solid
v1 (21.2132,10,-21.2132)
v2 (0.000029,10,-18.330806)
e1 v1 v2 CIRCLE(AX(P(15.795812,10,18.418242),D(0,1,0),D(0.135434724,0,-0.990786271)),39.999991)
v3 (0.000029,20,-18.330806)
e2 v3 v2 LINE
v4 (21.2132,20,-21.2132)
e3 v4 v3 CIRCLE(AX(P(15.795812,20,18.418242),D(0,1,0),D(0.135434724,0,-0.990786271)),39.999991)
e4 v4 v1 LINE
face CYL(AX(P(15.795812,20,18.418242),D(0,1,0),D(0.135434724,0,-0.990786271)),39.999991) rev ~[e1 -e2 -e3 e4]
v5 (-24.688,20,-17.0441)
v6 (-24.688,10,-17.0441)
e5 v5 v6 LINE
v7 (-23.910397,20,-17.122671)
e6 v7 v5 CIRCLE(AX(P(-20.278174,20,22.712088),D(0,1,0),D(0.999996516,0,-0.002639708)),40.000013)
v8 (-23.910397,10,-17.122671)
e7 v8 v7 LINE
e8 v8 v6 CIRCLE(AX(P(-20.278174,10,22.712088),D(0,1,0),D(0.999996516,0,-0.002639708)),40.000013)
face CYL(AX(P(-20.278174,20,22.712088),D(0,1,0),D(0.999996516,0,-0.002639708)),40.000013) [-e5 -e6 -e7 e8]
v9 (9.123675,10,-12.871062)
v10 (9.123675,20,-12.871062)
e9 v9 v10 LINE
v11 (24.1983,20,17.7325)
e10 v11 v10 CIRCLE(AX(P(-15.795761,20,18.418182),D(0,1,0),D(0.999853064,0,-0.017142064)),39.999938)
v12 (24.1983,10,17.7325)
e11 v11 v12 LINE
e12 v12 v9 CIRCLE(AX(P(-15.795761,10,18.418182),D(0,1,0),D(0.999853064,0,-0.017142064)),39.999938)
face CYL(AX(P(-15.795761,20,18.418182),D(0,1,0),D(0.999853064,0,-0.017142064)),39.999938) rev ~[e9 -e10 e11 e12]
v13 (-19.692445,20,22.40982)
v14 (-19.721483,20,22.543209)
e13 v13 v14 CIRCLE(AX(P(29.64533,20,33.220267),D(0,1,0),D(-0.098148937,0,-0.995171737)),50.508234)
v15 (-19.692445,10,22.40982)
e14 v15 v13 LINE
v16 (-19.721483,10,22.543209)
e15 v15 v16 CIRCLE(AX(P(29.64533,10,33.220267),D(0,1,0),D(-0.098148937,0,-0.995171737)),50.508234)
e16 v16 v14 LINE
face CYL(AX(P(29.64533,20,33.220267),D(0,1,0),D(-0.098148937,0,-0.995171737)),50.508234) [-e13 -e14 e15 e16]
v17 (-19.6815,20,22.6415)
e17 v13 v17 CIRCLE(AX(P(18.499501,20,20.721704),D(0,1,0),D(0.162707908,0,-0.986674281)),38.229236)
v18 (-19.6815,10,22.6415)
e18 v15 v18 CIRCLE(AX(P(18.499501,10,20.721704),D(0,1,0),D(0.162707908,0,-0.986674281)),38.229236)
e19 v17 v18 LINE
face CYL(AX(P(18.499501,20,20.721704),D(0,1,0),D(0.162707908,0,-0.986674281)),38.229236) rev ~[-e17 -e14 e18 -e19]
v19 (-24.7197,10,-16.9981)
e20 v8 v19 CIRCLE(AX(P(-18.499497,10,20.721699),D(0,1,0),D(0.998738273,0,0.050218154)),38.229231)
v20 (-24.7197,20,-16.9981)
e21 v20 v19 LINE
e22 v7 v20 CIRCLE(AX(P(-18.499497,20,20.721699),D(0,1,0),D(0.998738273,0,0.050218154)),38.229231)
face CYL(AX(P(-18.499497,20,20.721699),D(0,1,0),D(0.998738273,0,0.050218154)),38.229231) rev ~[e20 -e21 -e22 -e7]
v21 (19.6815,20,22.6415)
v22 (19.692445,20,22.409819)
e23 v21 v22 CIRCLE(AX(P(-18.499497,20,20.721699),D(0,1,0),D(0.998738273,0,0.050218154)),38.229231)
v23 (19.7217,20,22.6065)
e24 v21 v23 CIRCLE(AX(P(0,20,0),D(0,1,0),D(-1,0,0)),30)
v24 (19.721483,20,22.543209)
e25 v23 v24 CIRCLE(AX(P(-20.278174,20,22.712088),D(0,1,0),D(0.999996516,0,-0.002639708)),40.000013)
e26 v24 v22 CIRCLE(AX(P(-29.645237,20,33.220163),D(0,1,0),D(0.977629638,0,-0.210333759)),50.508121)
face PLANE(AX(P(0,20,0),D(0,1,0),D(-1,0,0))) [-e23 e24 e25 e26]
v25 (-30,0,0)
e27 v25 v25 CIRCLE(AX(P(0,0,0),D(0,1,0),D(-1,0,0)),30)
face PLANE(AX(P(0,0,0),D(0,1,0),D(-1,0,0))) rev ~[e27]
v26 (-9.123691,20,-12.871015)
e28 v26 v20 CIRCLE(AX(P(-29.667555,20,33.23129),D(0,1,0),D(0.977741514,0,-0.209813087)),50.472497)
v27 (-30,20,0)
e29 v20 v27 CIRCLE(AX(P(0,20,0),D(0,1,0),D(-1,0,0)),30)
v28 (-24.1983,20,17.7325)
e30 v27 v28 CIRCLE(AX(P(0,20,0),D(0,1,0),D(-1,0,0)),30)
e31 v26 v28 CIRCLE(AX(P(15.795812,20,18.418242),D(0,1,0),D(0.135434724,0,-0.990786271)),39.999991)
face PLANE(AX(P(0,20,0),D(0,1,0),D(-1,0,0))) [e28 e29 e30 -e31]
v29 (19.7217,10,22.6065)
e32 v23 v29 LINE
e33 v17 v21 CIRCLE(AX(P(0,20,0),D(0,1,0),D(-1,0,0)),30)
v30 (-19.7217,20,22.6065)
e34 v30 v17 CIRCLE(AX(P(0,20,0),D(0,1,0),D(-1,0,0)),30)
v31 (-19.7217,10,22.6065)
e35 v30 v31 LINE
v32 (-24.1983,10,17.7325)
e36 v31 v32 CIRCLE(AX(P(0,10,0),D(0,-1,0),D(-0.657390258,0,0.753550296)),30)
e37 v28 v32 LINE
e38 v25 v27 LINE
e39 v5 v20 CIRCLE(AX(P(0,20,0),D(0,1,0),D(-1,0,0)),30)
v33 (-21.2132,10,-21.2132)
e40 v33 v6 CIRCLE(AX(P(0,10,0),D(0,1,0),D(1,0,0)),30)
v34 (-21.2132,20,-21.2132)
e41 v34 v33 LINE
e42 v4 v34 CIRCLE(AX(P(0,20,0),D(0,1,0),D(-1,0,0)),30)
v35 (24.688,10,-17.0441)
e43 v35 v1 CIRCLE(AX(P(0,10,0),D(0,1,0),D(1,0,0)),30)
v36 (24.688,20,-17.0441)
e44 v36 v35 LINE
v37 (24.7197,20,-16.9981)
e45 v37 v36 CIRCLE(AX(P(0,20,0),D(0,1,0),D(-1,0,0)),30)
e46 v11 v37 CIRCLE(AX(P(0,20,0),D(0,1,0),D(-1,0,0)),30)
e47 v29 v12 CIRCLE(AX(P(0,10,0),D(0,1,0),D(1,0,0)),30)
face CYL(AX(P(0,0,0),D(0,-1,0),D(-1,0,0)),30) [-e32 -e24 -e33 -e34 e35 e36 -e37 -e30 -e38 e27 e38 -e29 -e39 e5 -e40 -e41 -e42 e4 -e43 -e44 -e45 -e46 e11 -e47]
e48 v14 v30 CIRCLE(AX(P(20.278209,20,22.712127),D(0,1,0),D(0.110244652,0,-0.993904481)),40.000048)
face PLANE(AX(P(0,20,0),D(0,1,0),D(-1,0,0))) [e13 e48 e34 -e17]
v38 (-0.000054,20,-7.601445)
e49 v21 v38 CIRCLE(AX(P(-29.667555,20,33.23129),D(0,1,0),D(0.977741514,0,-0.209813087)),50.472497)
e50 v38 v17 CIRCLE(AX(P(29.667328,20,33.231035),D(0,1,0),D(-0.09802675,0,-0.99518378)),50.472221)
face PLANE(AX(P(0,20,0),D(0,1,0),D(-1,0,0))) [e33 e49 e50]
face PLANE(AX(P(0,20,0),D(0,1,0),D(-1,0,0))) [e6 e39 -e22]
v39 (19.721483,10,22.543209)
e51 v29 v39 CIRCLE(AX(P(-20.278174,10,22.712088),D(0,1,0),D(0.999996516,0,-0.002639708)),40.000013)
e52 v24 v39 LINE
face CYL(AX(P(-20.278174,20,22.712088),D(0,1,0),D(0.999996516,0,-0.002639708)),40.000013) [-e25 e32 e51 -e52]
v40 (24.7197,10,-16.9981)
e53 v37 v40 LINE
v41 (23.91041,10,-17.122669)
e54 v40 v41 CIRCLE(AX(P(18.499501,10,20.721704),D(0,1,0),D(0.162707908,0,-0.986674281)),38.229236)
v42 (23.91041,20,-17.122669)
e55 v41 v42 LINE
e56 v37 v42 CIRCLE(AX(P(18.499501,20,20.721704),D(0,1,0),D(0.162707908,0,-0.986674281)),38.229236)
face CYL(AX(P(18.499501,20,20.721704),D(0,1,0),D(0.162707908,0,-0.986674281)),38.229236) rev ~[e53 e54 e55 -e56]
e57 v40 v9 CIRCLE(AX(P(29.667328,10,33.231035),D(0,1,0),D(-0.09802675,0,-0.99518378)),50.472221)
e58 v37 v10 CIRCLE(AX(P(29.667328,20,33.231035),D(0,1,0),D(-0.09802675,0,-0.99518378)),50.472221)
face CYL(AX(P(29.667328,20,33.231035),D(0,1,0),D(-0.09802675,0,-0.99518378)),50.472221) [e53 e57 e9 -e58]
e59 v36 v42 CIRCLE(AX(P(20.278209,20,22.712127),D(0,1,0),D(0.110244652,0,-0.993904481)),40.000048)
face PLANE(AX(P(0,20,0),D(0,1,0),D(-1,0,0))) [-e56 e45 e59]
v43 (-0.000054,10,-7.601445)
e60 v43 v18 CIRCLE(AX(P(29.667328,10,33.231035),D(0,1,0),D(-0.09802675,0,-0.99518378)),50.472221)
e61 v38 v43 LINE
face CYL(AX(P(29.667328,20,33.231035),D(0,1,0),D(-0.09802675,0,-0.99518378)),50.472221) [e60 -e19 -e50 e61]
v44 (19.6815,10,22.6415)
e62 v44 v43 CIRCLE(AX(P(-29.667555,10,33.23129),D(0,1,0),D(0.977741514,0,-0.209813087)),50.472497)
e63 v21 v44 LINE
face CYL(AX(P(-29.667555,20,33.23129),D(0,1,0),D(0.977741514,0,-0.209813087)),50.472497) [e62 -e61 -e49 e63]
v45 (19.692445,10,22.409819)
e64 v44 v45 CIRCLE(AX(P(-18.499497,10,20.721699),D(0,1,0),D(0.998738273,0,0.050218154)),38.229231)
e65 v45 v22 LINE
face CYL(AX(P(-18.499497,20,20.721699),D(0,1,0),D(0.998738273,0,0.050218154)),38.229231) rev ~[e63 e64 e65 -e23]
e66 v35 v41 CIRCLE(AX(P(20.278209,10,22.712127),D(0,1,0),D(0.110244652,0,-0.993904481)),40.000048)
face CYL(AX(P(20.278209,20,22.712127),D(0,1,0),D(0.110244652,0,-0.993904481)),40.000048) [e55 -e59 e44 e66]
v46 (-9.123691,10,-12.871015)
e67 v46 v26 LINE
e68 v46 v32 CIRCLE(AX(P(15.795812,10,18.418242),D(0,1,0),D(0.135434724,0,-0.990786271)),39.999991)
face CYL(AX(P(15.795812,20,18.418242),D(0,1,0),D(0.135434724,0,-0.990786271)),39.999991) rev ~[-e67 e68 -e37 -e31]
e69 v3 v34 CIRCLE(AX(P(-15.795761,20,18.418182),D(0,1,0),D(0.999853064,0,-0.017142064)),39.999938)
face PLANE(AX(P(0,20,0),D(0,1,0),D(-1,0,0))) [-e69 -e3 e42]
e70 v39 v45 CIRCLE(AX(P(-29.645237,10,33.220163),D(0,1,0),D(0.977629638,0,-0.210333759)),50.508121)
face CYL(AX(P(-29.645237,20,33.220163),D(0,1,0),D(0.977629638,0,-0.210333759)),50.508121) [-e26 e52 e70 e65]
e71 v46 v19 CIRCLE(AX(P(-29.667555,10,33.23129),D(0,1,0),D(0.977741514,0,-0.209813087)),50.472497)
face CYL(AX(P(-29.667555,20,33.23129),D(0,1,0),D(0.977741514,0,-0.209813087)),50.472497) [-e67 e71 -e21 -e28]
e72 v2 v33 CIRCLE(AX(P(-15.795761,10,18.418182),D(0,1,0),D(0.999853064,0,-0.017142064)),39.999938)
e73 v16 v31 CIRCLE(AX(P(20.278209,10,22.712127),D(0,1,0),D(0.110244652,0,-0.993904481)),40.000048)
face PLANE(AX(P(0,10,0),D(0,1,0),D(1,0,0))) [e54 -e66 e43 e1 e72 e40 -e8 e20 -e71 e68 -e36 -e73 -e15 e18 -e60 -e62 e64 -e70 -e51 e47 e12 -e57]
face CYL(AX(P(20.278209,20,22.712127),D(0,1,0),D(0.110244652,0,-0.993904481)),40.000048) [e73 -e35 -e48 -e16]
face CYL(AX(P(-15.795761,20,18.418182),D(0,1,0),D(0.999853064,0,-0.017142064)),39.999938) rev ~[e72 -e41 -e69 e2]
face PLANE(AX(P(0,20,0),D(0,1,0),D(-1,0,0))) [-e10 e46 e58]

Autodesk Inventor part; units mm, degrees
ref_plane "YZ Plane" through (0, 0, 0) normal (1, 0, 0) x (0, 1, 0)
ref_plane "XZ Plane" through (0, 0, 0) normal (0, 1, 0) x (-1, 0, 0)
ref_plane "XY Plane" through (0, 0, 0) normal (0, 0, 1) x (1, 0, 0)
sketch "Esboço1" plane through (0, 0, 0) normal (0, 1, 0) x (-1, 0, 0)
  circle A0 centre (0, 0) radius 30
extrude "Extrusão1" add sketch "Esboço1" along normal blind 20
sketch "Esboço2" plane through (0, 20, 0) normal (0, 1, 0) x (1, 0, 0)
  circle A0 centre (0, 0) radius 30 projected
  arc A1 (21.2132, 21.2132) -> (-24.1983, -17.7325) centre (15.7958, -18.4182) ccw
  arc A2 (24.1983, -17.7325) -> (-21.2132, 21.2132) centre (-15.7958, -18.4182) ccw
  arc A3 (24.688, 17.0441) -> (-19.7217, -22.6065) centre (20.2782, -22.7121) ccw
  arc A4 (19.7217, -22.6065) -> (-24.688, 17.0441) centre (-20.2782, -22.7121) ccw
  point P0 (-6.4534, 14.8229)
  point P1 (0, 11.7668)
  point P2 (6.4534, 14.8229)
  point P3 (0, 18.3308)
extrude "Extrusão2" cut sketch "Esboço2" against normal blind 10 contours A3 A2 A1 A0 | A0 A4 A3 A2 | A3 A4 A1 A2 | A2 A1 A4 A0 | A3 A0 A1 A4
sketch "Esboço3" plane through (0, 20, 0) normal (0, 1, 0) x (1, 0, 0)
  circle A0 centre (0, 0) radius 30 projected
  arc A1 (-6.4534, 14.8229) -> (-24.688, 17.0441) centre (-20.2782, -22.7121) ccw projected
  arc A2 (19.733, -22.5966) -> (-24.688, 17.0441) centre (-29.6453, -33.2202) ccw
  arc A3 (24.688, 17.0441) -> (-19.733, -22.5966) centre (29.6453, -33.2202) ccw
  arc A4 (19.7217, -22.6065) -> (0, 11.7668) centre (-20.2782, -22.7121) ccw projected
  arc A5 (19.733, -22.5966) -> (0, 11.7668) centre (-9.6777, -16.638) ccw
  arc A6 (0, 11.7668) -> (-19.733, -22.5966) centre (6.925, -15.0573) ccw
  point P0 (0, 7.6727)
  point P1 (19.7215, -22.5432)
extrude "Extrusão3" cut sketch "Esboço3" against normal blind 10 contours A2 A3 A4 | A6 A2 A3 | A6 A4 A3 A2
sketch "Esboço4" plane through (0, 20, 0) normal (0, 1, 0) x (1, 0, 0)
  circle A0 centre (0, 0) radius 30 projected
  arc A1 (19.6815, -22.6415) -> (-24.7197, 16.9981) centre (-29.6674, -33.2312) ccw
  arc A2 (24.7197, 16.9981) -> (-19.6815, -22.6415) centre (29.6674, -33.2312) ccw
  arc A3 (24.7197, 16.9981) -> (-19.6815, -22.6415) centre (18.4995, -20.7217) ccw
  arc A4 (19.6815, -22.6415) -> (-24.7197, 16.9981) centre (-18.4995, -20.7217) ccw
  point P0 (3.9682, 10.2085)
  point P1 (0, 12.7334)
  point P2 (-3.9682, 10.2085)
  point P3 (0, 7.6014)
extrude "Extrusão4" cut sketch "Esboço4" against normal blind 10 contours A2 A4 A3 | A1 A2 A4 | A4 A3 A1 | A2 A1 A3 A4 | A3 A1 A2
properties part number "Xbox Simbol"
